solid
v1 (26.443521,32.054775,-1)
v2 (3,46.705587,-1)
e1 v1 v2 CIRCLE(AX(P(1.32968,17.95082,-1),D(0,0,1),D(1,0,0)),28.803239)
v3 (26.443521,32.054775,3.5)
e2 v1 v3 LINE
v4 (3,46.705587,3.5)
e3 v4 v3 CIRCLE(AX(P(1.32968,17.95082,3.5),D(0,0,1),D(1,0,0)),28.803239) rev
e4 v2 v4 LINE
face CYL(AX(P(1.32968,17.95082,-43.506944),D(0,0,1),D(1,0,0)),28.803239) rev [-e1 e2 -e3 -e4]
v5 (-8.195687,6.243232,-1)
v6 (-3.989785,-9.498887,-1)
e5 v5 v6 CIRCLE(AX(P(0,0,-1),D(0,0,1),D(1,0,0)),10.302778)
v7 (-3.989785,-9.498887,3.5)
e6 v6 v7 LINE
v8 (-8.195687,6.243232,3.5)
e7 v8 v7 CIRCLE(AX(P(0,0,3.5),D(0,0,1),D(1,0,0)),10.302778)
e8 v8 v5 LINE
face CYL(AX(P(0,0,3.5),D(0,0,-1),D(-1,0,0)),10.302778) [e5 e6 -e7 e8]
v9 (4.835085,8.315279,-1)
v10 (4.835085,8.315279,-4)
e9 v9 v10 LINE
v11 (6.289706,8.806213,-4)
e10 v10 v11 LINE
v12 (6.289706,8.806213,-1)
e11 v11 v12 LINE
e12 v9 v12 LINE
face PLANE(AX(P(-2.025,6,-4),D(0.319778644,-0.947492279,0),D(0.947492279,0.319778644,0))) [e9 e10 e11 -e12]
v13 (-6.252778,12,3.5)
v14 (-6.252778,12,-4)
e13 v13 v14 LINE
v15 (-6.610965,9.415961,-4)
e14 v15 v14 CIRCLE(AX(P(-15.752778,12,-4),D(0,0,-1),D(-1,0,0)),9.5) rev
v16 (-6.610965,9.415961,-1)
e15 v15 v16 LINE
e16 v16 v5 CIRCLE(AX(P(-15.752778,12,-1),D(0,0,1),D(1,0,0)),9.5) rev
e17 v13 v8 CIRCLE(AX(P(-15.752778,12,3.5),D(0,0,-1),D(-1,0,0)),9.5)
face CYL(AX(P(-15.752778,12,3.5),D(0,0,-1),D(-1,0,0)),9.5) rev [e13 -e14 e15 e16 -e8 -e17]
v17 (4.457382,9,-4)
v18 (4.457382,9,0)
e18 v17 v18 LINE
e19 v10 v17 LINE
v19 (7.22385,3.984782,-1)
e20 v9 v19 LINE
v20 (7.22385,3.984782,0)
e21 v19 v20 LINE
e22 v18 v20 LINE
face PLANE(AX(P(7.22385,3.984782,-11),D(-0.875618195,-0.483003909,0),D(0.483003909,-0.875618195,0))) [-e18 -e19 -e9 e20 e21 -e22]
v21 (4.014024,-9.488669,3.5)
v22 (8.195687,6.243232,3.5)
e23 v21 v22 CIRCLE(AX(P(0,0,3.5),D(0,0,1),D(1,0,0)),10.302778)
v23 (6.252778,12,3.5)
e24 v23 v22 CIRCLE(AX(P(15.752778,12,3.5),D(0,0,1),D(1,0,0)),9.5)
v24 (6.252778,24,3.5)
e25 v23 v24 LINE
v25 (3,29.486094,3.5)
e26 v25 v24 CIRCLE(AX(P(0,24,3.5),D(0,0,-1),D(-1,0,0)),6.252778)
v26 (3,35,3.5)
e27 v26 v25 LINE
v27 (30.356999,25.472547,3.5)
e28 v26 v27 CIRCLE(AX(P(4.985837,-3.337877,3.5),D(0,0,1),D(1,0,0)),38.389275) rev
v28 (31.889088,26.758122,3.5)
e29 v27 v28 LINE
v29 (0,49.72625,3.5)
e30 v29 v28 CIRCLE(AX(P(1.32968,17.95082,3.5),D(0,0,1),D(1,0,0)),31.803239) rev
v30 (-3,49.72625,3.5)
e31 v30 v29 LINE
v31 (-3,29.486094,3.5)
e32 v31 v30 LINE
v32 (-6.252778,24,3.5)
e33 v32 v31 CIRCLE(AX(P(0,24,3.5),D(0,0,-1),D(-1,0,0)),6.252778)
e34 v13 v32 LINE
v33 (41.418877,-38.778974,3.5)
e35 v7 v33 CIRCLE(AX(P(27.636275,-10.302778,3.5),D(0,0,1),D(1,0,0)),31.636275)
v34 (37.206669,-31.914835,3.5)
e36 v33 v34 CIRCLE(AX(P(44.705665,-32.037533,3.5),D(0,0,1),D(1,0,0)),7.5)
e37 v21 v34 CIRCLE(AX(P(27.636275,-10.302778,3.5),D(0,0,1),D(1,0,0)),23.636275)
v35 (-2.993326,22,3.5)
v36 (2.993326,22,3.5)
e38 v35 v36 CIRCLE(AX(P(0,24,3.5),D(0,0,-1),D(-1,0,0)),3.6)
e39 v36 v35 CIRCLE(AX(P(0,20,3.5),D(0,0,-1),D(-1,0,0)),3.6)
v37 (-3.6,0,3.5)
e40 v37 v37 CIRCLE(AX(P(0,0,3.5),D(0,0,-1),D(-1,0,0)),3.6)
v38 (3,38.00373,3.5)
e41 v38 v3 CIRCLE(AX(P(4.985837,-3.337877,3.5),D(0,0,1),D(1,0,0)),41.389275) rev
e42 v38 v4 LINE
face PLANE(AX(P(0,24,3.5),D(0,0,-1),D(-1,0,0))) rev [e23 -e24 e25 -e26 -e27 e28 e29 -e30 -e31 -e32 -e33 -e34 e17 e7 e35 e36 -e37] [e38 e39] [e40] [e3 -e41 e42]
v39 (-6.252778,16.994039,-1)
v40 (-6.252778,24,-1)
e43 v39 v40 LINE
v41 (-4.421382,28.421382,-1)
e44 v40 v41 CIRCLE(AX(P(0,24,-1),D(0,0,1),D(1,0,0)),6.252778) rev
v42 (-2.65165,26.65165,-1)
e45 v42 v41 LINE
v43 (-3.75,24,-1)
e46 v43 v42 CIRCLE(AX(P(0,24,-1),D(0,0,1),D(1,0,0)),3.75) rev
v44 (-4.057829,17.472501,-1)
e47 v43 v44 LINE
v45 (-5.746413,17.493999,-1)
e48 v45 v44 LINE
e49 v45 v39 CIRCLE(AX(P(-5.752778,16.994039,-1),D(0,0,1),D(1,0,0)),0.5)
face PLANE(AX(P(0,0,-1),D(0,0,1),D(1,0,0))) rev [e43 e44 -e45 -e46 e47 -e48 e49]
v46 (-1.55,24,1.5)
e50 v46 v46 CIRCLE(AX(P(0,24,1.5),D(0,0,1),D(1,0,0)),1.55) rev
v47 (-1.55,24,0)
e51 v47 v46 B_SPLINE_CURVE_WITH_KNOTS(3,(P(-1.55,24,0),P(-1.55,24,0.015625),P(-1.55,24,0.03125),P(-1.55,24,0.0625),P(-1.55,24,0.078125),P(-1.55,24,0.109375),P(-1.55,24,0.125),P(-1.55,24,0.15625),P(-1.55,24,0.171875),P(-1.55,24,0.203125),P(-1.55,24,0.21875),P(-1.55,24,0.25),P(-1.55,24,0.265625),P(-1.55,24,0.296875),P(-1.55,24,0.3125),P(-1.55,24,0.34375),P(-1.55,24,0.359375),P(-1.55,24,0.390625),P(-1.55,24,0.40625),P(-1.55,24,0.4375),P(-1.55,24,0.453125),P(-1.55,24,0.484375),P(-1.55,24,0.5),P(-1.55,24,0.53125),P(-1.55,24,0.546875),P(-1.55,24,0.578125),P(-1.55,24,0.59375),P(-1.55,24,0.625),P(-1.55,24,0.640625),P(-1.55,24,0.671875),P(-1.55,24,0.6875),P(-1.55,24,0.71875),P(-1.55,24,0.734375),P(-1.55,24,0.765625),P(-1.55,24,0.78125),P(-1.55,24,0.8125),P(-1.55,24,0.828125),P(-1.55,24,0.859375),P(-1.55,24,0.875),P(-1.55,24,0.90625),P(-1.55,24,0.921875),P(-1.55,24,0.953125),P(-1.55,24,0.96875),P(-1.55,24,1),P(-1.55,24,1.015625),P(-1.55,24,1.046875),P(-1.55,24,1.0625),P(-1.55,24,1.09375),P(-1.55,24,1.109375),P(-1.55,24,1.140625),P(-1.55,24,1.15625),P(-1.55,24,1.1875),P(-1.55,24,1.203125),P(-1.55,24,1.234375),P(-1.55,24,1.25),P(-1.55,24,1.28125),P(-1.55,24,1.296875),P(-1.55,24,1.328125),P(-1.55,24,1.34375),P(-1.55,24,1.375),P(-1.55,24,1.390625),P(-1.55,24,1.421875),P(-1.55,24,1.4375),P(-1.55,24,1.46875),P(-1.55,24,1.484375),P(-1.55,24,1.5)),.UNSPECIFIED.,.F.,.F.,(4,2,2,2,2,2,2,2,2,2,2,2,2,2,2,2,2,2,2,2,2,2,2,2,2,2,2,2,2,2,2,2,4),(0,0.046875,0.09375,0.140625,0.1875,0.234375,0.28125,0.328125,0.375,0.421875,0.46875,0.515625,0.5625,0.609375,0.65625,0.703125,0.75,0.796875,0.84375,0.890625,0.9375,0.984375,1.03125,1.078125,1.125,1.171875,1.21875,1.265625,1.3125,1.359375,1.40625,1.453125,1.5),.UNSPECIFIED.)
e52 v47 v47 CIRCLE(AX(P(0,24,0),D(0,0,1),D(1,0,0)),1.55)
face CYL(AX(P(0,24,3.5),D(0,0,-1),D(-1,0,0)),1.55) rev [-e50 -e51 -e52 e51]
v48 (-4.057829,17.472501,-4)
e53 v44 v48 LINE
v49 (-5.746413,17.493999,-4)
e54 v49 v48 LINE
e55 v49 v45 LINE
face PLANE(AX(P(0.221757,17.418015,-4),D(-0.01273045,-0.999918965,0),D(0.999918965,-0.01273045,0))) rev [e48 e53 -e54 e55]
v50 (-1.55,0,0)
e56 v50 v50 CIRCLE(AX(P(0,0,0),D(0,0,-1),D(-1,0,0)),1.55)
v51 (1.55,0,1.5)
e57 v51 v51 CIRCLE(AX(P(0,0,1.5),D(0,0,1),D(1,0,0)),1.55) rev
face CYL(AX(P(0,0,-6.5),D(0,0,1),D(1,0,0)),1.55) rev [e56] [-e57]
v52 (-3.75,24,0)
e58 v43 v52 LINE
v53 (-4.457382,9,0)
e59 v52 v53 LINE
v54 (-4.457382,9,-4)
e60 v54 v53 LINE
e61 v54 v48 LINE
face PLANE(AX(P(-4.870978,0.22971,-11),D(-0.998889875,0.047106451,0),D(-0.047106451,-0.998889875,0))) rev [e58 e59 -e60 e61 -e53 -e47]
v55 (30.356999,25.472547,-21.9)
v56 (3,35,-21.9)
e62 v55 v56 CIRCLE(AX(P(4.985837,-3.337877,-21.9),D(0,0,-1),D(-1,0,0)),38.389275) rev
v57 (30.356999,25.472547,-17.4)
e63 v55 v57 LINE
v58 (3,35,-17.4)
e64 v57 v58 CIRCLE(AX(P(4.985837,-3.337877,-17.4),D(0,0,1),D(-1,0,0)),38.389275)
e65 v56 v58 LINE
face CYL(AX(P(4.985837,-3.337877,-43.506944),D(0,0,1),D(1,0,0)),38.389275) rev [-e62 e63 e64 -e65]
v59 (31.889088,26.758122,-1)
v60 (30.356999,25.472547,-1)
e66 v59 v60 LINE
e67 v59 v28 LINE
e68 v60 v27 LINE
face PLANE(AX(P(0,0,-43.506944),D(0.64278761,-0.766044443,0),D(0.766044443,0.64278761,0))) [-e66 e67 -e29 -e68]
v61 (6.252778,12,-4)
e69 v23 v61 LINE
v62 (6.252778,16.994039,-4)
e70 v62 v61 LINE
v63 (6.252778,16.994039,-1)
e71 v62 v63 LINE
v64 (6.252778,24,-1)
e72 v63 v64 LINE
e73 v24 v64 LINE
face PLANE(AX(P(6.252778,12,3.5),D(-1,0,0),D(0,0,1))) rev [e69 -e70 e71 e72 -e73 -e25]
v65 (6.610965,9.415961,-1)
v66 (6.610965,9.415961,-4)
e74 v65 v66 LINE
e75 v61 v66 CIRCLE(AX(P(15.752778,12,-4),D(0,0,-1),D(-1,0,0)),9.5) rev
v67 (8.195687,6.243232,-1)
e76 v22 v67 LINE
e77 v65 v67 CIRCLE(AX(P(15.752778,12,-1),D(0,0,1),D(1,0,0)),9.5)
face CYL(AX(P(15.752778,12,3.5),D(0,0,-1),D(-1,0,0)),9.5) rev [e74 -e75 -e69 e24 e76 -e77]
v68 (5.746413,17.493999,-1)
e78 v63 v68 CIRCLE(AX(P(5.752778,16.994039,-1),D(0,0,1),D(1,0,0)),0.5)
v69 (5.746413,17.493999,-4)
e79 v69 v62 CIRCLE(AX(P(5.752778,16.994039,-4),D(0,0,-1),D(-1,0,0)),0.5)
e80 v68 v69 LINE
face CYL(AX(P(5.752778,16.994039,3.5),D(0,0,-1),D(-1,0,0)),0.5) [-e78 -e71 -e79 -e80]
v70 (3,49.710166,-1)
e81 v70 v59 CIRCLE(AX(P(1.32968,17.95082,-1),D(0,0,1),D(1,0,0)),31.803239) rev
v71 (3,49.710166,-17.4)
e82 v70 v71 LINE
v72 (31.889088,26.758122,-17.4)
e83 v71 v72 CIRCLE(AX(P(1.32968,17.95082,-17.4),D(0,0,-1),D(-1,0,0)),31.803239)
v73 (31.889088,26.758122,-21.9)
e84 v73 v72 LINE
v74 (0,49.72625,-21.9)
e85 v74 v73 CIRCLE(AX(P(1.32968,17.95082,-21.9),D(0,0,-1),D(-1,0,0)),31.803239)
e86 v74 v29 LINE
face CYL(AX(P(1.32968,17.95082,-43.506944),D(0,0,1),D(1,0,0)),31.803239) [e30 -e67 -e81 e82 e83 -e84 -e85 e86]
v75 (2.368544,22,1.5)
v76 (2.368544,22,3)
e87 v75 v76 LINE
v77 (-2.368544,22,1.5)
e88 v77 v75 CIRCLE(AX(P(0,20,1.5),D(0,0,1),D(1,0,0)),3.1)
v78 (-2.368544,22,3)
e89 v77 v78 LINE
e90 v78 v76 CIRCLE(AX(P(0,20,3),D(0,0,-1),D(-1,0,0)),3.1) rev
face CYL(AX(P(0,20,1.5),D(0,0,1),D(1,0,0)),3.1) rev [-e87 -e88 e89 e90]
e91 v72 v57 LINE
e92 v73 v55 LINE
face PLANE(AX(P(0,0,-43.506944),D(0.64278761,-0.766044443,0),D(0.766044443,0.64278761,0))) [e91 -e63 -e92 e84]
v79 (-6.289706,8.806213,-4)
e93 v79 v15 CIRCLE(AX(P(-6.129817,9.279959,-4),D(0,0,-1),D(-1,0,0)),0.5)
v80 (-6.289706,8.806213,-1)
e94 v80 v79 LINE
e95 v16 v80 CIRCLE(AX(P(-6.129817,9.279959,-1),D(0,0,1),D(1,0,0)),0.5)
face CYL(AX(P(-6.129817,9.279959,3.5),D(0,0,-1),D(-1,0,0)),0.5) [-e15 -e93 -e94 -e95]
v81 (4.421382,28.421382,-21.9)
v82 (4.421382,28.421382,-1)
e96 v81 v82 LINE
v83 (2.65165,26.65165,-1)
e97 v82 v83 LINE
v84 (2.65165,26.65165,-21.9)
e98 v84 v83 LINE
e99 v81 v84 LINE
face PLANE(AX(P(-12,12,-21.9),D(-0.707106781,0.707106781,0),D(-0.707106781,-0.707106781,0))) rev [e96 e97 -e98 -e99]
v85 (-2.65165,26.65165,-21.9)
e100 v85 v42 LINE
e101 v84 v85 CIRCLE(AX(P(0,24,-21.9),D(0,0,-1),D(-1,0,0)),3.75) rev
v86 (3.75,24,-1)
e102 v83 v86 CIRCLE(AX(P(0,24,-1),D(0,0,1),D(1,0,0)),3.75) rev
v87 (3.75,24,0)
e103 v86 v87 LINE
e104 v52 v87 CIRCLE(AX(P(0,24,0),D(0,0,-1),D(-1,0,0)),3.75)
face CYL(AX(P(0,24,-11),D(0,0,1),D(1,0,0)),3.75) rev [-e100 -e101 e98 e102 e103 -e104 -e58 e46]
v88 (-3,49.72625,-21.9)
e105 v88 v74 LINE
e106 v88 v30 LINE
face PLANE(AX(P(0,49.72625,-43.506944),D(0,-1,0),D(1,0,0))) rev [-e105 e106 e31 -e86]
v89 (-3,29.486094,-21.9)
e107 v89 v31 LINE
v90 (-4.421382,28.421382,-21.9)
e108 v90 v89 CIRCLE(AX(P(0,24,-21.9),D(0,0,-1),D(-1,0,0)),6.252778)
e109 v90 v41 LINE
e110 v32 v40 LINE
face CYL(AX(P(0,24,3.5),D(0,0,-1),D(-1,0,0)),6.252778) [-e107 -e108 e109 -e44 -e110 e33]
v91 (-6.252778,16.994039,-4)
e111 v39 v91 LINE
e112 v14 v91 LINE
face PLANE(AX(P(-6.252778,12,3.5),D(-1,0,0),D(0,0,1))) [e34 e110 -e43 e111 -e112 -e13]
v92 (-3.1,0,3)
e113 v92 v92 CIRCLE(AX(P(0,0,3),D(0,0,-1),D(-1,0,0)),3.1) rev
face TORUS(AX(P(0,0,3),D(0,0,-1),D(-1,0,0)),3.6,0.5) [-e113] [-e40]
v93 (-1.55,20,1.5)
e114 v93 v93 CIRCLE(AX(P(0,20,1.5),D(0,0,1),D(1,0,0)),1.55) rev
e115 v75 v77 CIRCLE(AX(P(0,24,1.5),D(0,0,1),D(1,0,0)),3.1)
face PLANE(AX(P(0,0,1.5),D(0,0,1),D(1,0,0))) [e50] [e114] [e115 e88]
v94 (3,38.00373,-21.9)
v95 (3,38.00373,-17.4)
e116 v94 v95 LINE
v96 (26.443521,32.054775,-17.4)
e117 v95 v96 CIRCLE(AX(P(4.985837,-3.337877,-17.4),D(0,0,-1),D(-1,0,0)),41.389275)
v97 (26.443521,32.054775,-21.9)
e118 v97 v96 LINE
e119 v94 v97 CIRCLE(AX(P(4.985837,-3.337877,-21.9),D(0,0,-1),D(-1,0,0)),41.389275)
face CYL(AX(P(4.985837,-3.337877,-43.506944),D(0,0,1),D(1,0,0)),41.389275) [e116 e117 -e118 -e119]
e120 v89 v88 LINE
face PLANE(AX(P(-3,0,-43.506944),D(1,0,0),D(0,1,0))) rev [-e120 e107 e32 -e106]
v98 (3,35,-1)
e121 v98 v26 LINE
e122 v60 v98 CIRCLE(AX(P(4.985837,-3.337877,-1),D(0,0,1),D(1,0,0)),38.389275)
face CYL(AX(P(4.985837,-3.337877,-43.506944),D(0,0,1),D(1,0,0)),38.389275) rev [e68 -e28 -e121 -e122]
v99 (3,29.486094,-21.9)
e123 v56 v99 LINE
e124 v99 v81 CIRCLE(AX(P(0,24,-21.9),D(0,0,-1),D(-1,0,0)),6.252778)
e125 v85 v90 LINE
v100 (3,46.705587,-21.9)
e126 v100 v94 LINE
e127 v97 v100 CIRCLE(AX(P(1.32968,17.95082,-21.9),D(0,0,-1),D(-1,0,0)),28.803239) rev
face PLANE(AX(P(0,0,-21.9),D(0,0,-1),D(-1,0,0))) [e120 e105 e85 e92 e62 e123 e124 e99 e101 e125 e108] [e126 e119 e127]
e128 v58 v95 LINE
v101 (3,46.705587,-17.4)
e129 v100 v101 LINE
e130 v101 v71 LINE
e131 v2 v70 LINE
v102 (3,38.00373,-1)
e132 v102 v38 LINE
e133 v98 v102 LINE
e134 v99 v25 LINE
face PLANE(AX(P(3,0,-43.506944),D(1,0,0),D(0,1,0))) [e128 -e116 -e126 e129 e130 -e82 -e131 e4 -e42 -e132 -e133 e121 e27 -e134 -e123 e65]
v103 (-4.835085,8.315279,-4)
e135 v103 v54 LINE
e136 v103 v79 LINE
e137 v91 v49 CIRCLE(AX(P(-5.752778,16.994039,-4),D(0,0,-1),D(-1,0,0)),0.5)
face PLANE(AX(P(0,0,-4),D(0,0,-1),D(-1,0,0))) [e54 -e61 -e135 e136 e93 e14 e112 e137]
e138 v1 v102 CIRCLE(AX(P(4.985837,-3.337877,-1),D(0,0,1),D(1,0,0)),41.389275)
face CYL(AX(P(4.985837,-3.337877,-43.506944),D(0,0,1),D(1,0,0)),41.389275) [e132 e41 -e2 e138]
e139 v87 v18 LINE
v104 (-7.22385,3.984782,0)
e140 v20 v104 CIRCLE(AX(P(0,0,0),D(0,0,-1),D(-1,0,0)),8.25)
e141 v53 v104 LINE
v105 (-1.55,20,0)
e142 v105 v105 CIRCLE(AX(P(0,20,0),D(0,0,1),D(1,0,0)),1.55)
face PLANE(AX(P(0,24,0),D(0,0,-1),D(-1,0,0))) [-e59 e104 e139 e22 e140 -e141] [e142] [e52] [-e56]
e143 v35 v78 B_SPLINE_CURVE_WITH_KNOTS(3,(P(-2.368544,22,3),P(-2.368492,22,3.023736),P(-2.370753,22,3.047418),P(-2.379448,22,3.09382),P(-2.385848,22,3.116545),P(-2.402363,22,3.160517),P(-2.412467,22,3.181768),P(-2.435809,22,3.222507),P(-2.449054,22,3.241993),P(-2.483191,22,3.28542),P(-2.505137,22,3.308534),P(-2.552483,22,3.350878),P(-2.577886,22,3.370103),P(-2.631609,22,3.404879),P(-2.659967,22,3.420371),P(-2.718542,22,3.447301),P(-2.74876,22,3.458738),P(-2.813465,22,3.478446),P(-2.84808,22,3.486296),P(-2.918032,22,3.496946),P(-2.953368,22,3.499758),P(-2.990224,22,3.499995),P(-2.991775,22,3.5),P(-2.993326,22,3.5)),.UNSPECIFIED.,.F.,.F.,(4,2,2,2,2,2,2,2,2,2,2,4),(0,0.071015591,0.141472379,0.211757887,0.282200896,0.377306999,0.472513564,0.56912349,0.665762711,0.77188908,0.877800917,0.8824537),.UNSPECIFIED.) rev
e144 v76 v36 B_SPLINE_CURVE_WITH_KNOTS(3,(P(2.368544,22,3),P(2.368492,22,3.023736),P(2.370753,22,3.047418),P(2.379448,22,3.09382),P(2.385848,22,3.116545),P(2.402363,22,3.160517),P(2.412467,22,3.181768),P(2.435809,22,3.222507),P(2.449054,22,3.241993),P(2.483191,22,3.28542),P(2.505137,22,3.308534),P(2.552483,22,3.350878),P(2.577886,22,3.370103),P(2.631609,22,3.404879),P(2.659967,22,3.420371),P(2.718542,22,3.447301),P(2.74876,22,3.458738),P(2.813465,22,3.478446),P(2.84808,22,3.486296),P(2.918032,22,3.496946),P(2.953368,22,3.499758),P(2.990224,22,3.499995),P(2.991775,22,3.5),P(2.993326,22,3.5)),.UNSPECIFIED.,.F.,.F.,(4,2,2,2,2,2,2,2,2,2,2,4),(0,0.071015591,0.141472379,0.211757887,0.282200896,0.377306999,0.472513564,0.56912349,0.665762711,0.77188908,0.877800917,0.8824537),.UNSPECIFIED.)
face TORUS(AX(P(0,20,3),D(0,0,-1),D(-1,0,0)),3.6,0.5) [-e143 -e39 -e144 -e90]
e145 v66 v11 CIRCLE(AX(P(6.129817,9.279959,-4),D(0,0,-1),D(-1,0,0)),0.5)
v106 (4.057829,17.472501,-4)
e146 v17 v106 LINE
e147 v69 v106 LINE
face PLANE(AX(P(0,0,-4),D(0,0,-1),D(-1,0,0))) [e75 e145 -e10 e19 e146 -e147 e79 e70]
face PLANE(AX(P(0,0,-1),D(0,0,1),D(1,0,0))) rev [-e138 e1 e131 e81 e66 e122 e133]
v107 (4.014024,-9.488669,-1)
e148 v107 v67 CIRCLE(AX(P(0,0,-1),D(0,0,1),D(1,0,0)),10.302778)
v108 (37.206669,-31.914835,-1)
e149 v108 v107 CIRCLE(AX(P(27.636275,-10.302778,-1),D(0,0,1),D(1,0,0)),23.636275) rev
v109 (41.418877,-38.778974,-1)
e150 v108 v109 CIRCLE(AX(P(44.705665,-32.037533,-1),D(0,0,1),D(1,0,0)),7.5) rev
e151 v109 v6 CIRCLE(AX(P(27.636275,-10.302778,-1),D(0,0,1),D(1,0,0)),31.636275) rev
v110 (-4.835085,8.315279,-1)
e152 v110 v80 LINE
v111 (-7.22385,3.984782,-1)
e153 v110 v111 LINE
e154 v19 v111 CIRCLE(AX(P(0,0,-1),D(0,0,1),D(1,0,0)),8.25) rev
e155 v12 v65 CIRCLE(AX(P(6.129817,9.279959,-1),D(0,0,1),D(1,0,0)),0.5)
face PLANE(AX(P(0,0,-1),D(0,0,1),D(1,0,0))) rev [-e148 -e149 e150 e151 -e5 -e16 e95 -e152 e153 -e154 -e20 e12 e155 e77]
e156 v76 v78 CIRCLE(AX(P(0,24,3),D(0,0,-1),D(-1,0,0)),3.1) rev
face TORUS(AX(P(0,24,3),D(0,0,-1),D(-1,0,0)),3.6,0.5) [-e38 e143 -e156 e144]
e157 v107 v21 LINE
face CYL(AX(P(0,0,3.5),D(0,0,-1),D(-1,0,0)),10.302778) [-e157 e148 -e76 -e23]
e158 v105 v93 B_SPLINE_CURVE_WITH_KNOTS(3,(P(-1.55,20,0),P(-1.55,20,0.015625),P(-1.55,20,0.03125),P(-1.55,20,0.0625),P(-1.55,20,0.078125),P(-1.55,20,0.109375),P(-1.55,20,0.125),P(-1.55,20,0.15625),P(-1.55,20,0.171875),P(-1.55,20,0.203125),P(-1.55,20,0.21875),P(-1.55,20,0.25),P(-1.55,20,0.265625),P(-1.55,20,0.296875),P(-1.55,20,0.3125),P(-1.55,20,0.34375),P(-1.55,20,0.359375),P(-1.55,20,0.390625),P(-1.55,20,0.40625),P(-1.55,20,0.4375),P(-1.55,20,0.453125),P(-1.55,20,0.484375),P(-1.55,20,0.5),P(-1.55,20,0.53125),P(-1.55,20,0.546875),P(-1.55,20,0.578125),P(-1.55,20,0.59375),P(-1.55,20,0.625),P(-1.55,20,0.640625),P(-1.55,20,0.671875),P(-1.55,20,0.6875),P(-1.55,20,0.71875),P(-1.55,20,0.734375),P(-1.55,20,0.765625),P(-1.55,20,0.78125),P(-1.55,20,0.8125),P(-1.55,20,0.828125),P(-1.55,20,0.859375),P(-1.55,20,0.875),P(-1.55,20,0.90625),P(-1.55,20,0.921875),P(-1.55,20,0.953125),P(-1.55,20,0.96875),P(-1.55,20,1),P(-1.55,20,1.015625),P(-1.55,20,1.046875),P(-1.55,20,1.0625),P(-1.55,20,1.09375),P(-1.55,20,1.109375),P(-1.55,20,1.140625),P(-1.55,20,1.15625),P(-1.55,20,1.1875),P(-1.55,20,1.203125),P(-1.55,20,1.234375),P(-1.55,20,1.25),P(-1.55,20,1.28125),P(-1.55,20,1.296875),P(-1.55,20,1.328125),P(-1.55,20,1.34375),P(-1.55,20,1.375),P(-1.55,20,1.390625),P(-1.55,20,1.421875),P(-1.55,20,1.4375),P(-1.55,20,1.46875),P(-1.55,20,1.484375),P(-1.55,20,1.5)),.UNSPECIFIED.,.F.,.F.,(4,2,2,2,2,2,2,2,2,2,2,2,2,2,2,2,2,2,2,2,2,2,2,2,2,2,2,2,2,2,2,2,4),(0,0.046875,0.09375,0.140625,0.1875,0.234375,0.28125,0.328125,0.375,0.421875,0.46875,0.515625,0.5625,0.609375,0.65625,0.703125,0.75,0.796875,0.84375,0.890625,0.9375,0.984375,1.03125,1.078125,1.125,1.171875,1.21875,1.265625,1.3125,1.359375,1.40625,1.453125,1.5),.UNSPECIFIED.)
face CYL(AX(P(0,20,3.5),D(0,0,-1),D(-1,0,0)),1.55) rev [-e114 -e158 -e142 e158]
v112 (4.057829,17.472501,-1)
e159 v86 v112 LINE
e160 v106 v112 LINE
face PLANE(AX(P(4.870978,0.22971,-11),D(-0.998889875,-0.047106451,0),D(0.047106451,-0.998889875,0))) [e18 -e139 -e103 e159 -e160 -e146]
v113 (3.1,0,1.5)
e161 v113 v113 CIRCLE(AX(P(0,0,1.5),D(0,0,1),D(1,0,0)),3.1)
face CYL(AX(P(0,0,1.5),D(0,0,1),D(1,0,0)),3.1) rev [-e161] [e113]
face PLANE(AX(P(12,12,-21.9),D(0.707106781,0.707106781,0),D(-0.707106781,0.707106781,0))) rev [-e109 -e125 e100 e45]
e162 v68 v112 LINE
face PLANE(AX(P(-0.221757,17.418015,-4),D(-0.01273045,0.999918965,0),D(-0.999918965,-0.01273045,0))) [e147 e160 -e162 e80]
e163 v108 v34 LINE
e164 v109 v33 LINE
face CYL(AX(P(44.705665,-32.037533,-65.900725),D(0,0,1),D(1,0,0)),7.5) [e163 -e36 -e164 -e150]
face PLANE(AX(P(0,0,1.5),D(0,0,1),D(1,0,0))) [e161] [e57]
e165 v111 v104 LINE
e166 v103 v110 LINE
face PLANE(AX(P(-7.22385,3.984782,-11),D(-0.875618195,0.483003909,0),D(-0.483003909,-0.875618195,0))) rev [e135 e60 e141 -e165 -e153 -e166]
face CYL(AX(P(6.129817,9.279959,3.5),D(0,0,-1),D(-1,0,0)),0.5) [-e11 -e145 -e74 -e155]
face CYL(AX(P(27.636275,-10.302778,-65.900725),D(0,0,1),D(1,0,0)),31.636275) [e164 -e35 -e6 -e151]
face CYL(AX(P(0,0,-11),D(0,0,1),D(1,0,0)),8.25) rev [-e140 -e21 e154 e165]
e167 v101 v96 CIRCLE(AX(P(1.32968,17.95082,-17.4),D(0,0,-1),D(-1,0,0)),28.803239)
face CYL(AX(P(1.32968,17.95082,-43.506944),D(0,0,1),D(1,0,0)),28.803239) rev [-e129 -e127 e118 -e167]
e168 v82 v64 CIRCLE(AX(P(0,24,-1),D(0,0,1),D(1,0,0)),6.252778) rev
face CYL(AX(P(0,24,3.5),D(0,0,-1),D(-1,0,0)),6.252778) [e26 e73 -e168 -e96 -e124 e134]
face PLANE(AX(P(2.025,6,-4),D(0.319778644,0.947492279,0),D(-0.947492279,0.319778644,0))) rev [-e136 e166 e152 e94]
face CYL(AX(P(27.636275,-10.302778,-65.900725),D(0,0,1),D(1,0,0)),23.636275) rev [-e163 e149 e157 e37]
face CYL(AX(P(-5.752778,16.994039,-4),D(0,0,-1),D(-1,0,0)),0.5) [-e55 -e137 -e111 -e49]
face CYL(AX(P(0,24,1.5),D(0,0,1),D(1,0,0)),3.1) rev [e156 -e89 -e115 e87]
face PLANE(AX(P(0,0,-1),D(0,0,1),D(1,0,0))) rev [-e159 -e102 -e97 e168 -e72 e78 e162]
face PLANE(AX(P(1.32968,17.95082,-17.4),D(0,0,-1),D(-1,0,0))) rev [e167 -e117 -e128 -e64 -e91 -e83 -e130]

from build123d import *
from build123d.topology import SkipClean

# Parameters (mm, degrees)
SKETCH1_R           = 1.55
BOSS_EXTRUDE1_DEPTH = 3.5
BOSS_EXTRUDE2_START = -1
BOSS_EXTRUDE2_DEPTH = 1
BOSS_EXTRUDE3_START = 3
BOSS_EXTRUDE3_DEPTH = 3
SKETCH3_R           = 3.1
CUT_EXTRUDE1_DEPTH  = 2
CUT_EXTRUDE7_START  = 11
CUT_EXTRUDE7_DEPTH  = 11
BOSS_EXTRUDE4_START = -4.5
BOSS_EXTRUDE4_DEPTH = 4.5
BOSS_EXTRUDE5_START = -4.5
BOSS_EXTRUDE5_DEPTH = 4.5
BOSS_EXTRUDE6_START = 20.9
BOSS_EXTRUDE6_DEPTH = 20.9
CUT_EXTRUDE8_DEPTH  = 16.4
SKETCH13_R          = 1.55
CUT_EXTRUDE9_DEPTH  = 10
SKETCH14_R          = 3.1
CUT_EXTRUDE10_DEPTH = 2
FILLET2_R           = 0.5


# Read off the part's stored shape, not the designer's step: Boss-Extrude5
with BuildPart() as part:
    # Sketch1 → Boss-Extrude1 (new body)
    with BuildSketch(Plane.XY):
        with BuildLine():
            Line((-6.252777778, 12), (-6.252777778, 24))
            ThreePointArc((-6.252777778, 24), (0, 30.252777778), (6.252777778, 24))
            Line((6.252777778, 24), (6.252777778, 12))
            ThreePointArc((6.252777778, 12), (6.751601127, 8.96210288), (8.195687022, 6.24323187))
            ThreePointArc((8.195687022, 6.24323187), (0, -10.302777778), (-8.195687022, 6.24323187))
            ThreePointArc((-8.195687022, 6.24323187), (-6.751601127, 8.96210288), (-6.252777778, 12))
        make_face()
        with Locations(Location((0, 20, 0), (0, 0, 180))):
            Circle(SKETCH1_R, mode=Mode.SUBTRACT)
        with Locations(Location((0, 24, 0), (0, 0, 180))):
            Circle(SKETCH1_R, mode=Mode.SUBTRACT)
    extrude(amount=BOSS_EXTRUDE1_DEPTH)

    # Sketch1<6> → Boss-Extrude2 (add)
    with SkipClean():  # the faces are left unmerged after this step: merging them gives an invalid solid
        with BuildSketch(Plane.XY.offset(BOSS_EXTRUDE2_START)):
            with BuildLine():
                Line((-6.252777778, 24), (-6.252777778, 12))
                ThreePointArc((-6.252777778, 12), (-6.751601127, 8.96210288), (-8.195687022, 6.24323187))
                ThreePointArc((-8.195687022, 6.24323187), (0, -10.302777778), (8.195687022, 6.24323187))
                ThreePointArc((8.195687022, 6.24323187), (6.751601127, 8.96210288), (6.252777778, 12))
                Line((6.252777778, 12), (6.252777778, 24))
                ThreePointArc((6.252777778, 24), (0, 30.252777778), (-6.252777778, 24))
            make_face()
            with BuildLine():
                ThreePointArc((-3.740199612, 9.599902958), (-3.562277736, 10.794094226), (-3.502777778, 12))
                Line((-3.502777778, 12), (-3.35, 24))
                ThreePointArc((-3.35, 24), (0, 27.35), (3.35, 24))
                Line((3.35, 24), (3.502777778, 12))
                ThreePointArc((3.502777778, 12), (3.562277736, 10.794094226), (3.740199612, 9.599902958))
                ThreePointArc((3.740199612, 9.599902958), (4.521843537, 7.73681106), (5.173381632, 5.824331843))
                ThreePointArc((5.173381632, 5.824331843), (7.105921174, 3.192585661), (7.790168094, 0))
                ThreePointArc((7.790168094, 0), (-3.192585661, -7.105921174), (-5.173381632, 5.824331843))
                ThreePointArc((-5.173381632, 5.824331843), (-4.521843537, 7.73681106), (-3.740199612, 9.599902958))
            make_face(mode=Mode.SUBTRACT)
        extrude(amount=BOSS_EXTRUDE2_DEPTH)

    # Sketch2 → Boss-Extrude3 (add)
    with SkipClean():  # the faces are left unmerged after this step: merging them gives an invalid solid
        with BuildSketch(Plane(origin=(0, 0, -1), x_dir=(-1, 0, 0), z_dir=(0, 0, -1)).offset(BOSS_EXTRUDE3_START)):
            with BuildLine():
                Line((6.252777778, 17.500445731), (3.583193826, 17.466457972))
                Line((3.583193826, 17.466457972), (3.65286916, 11.993777148))
                ThreePointArc((3.65286916, 11.993777148), (3.756779571, 10.417642799), (4.065118793, 8.868474059))
                ThreePointArc((4.065118793, 8.868474059), (4.214668194, 8.512593617), (4.359521295, 8.154775937))
                Line((4.359521295, 8.154775937), (6.751601127, 8.96210288))
                ThreePointArc((6.751601127, 8.96210288), (6.378313042, 10.460710907), (6.252777778, 12))
                Line((6.252777778, 12), (6.252777778, 17.500445731))
            make_face()
            with BuildLine():
                Line((-3.583193826, 17.466457972), (-6.252777778, 17.500445731))
                Line((-6.252777778, 17.500445731), (-6.252777778, 12))
                ThreePointArc((-6.252777778, 12), (-6.378313042, 10.460710907), (-6.751601127, 8.96210288))
                Line((-6.751601127, 8.96210288), (-4.359521295, 8.154775937))
                ThreePointArc((-4.359521295, 8.154775937), (-4.214668194, 8.512593617), (-4.065118793, 8.868474059))
                ThreePointArc((-4.065118793, 8.868474059), (-3.756779571, 10.417642799), (-3.65286916, 11.993777148))
                Line((-3.65286916, 11.993777148), (-3.583193826, 17.466457972))
            make_face()
        extrude(amount=-BOSS_EXTRUDE3_DEPTH)

    # Sketch3 → Cut-Extrude1 (cut)
    with SkipClean():  # the faces are left unmerged after this step: merging them gives an invalid solid
        with BuildSketch(Plane.XY.offset(3.5)):
            with Locations((0, 20)):
                Circle(SKETCH3_R)
            with Locations((0, 24)):
                Circle(SKETCH3_R)
        extrude(amount=-CUT_EXTRUDE1_DEPTH, mode=Mode.SUBTRACT)

    # Sketch8 → Cut-Extrude7 (cut)
    with SkipClean():  # the faces are left unmerged after this step: merging them gives an invalid solid
        with BuildSketch(Plane(origin=(0, 0, 0), x_dir=(-1, 0, 0), z_dir=(0, 0, -1)).offset(CUT_EXTRUDE7_START)):
            with BuildLine():
                Line((7.223850112, 3.984782248), (4.457382043, 9))
                Line((4.457382043, 9), (3.75, 24))
                ThreePointArc((3.75, 24), (0, 27.75), (-3.75, 24))
                Line((-3.75, 24), (-4.457382043, 9))
                Line((-4.457382043, 9), (-7.223850112, 3.984782248))
                ThreePointArc((-7.223850112, 3.984782248), (0, -8.25), (7.223850112, 3.984782248))
            make_face()
            with BuildLine():
                Line((3.35, 24), (3.502777778, 12))
                ThreePointArc((3.502777778, 12), (3.562277736, 10.794094226), (3.740199612, 9.599902958))
                ThreePointArc((3.740199612, 9.599902958), (4.521843537, 7.73681106), (5.173381632, 5.824331843))
                ThreePointArc((5.173381632, 5.824331843), (0, -7.790168094), (-5.173381632, 5.824331843))
                ThreePointArc((-5.173381632, 5.824331843), (-4.521843537, 7.73681106), (-3.740199612, 9.599902958))
                ThreePointArc((-3.740199612, 9.599902958), (-3.562277736, 10.794094226), (-3.502777778, 12))
                Line((-3.502777778, 12), (-3.35, 24))
                ThreePointArc((-3.35, 24), (0, 27.35), (3.35, 24))
            make_face(mode=Mode.SUBTRACT)
        extrude(amount=-CUT_EXTRUDE7_DEPTH, mode=Mode.SUBTRACT)

    # Sketch4 → Boss-Extrude4 (add)
    with SkipClean():  # the faces are left unmerged after this step: merging them gives an invalid solid
        with BuildSketch(Plane.XY.offset(3.5).offset(BOSS_EXTRUDE4_START)):
            with BuildLine():
                Line((-3, 35), (-3, 29.486094233))
                ThreePointArc((-3, 29.486094233), (0, 30.252777778), (3, 29.486094233))
                Line((3, 29.486094233), (3, 35))
                ThreePointArc((3, 35), (17.611661727, 32.915742455), (30.356999166, 25.472546804))
                Line((30.356999166, 25.472546804), (31.889088052, 26.758122023))
                ThreePointArc((31.889088052, 26.758122023), (19.916717904, 43.757176376), (0, 49.726250325))
                Line((0, 49.726250325), (-3, 49.726250325))
                Line((-3, 49.726250325), (-3, 35))
            make_face()
            with BuildLine():
                ThreePointArc((26.443521088, 32.054775081), (15.166000225, 36.77990325), (3, 38.003729853))
                Line((3, 38.003729853), (3, 46.705586839))
                ThreePointArc((3, 46.705586839), (16.594325155, 42.376568373), (26.443521088, 32.054775081))
            make_face(mode=Mode.SUBTRACT)
        extrude(amount=BOSS_EXTRUDE4_DEPTH)

    # Boss-Extrude5 outline → Boss-Extrude5 (add)
    with SkipClean():  # the faces are left unmerged after this step: merging them gives an invalid solid
        with BuildSketch(Plane.XY.offset(3.5).offset(BOSS_EXTRUDE5_START)):
            with BuildLine():
                ThreePointArc((37.206668655, -31.914835371), (14.403856046, -29.887888853), (4.014024416, -9.488668923))
                ThreePointArc((4.014024416, -9.488668923), (0.013152601, -10.302769383), (-3.989784744, -9.498886653))
                ThreePointArc((-3.989784744, -9.498886653), (10.49194269, -36.890853177), (41.418876904, -38.778973849))
                ThreePointArc((41.418876904, -38.778973849), (51.098034229, -28.114827977), (37.206668655, -31.914835371))
            make_face()
        extrude(amount=BOSS_EXTRUDE5_DEPTH)

    # Sketch11 → Boss-Extrude6 (add)
    # profile 1 of 2: a face of its own
    with SkipClean():  # the faces are left unmerged after this step: merging them gives an invalid solid
        with BuildSketch(Plane(origin=(0, 0, -1), x_dir=(-1, 0, 0), z_dir=(0, 0, -1)).offset(BOSS_EXTRUDE6_START)):
            with BuildLine():
                Line((0, 49.726250325), (0, 27.75))
                ThreePointArc((0, 27.75), (1.435062871, 27.464548247), (2.651650429, 26.651650429))
                Line((2.651650429, 26.651650429), (4.421381568, 28.421381568))
                ThreePointArc((4.421381568, 28.421381568), (3.748683684, 29.00445807), (3, 29.486094233))
                Line((3, 29.486094233), (3, 49.726250325))
                Line((3, 49.726250325), (0, 49.726250325))
            make_face()
        # profile 2 of 2: a face of its own
        with BuildSketch(Plane(origin=(0, 0, -1), x_dir=(-1, 0, 0), z_dir=(0, 0, -1)).offset(BOSS_EXTRUDE6_START)):
            with BuildLine():
                ThreePointArc((-3, 29.486094233), (-3.748683684, 29.00445807), (-4.421381568, 28.421381568))
                Line((-4.421381568, 28.421381568), (-2.651650429, 26.651650429))
                ThreePointArc((-2.651650429, 26.651650429), (-1.435062871, 27.464548247), (0, 27.75))
                Line((0, 27.75), (0, 49.726250325))
                ThreePointArc((0, 49.726250325), (-19.916717904, 43.757176376), (-31.889088052, 26.758122023))
                Line((-31.889088052, 26.758122023), (-30.356999166, 25.472546804))
                ThreePointArc((-30.356999166, 25.472546804), (-17.611661727, 32.915742455), (-3, 35))
                Line((-3, 35), (-3, 29.486094233))
            make_face()
            with BuildLine():
                ThreePointArc((-26.443521088, 32.054775081), (-16.594325155, 42.376568373), (-3, 46.705586839))
                Line((-3, 46.705586839), (-3, 38.003729853))
                ThreePointArc((-3, 38.003729853), (-15.166000225, 36.77990325), (-26.443521088, 32.054775081))
            make_face(mode=Mode.SUBTRACT)
        extrude(amount=-BOSS_EXTRUDE6_DEPTH)

    # Sketch12 → Cut-Extrude8 (cut)
    with SkipClean():  # the faces are left unmerged after this step: merging them gives an invalid solid
        with BuildSketch(Plane(origin=(0, 0, -17.4), x_dir=(-1, 0, 0), z_dir=(0, 0, -1))):
            with BuildLine():
                Line((-3, 49.710165883), (-3, 35))
                ThreePointArc((-3, 35), (-17.611661727, 32.915742455), (-30.356999166, 25.472546804))
                Line((-30.356999166, 25.472546804), (-31.889088052, 26.758122023))
                ThreePointArc((-31.889088052, 26.758122023), (-21.113206485, 42.851785565), (-3, 49.710165883))
            make_face()
        extrude(amount=-CUT_EXTRUDE8_DEPTH, mode=Mode.SUBTRACT)

    # Sketch13 → Cut-Extrude9 (cut)
    with SkipClean():  # the faces are left unmerged after this step: merging them gives an invalid solid
        with BuildSketch(Plane.XY.offset(3.5)):
            Circle(SKETCH13_R)
        extrude(amount=-CUT_EXTRUDE9_DEPTH, mode=Mode.SUBTRACT)

    # Sketch14 → Cut-Extrude10 (cut)
    with SkipClean():  # the faces are left unmerged after this step: merging them gives an invalid solid
        with BuildSketch(Plane.XY.offset(3.5)):
            Circle(SKETCH14_R)
        extrude(amount=-CUT_EXTRUDE10_DEPTH, mode=Mode.SUBTRACT)

    # Fillet2
    # the kernel refuses this fillet: 0.5 mm, written as the material it takes off along each edge
    with BuildSketch(Plane(origin=(0, 24, 3.5), x_dir=(0.44840297352360914, -0.8938315128340382, 0), z_dir=(-0.8938315128340382, -0.44840297352360914, 0))) as fillet2_piece_1:
        with BuildLine():
            CenterArc((3.1 + FILLET2_R, -FILLET2_R), FILLET2_R, 90, 90)
            Line((3.1, -FILLET2_R), (3.1, 0))
            Line((3.1, 0), (3.1 + FILLET2_R, 0))
        make_face()
    revolve(axis=Axis((0, 24, 3.5), (0, 0, 1)), revolution_arc=306.717467059, mode=Mode.SUBTRACT)
    with BuildSketch(Plane(origin=(0, 20, 3.5), x_dir=(0.44840297352362823, 0.8938315128340286, 0), z_dir=(-0.8938315128340286, 0.44840297352362823, 0))) as fillet2_piece_2:
        with BuildLine():
            CenterArc((3.1 + FILLET2_R, FILLET2_R), FILLET2_R, 180, 90)
            Line((3.1, FILLET2_R), (3.1, 0))
            Line((3.1, 0), (3.1 + FILLET2_R, 0))
        make_face()
    revolve(axis=Axis((0, 20, 3.5), (0, 0, -1)), revolution_arc=306.717467059, mode=Mode.SUBTRACT)
    with BuildSketch(Plane(origin=(0, 0, 3.5), x_dir=(1, 0, 0), z_dir=(0, -1, 0))) as fillet2_piece_3:
        with BuildLine():
            CenterArc((3.1 + FILLET2_R, -FILLET2_R), FILLET2_R, 90, 90)
            Line((3.1, -FILLET2_R), (3.1, 0))
            Line((3.1, 0), (3.1 + FILLET2_R, 0))
        make_face()
    revolve(axis=Axis((0, 0, 3.5), (0, 0, 1)), mode=Mode.SUBTRACT)
    with BuildSketch(Plane(origin=(-6.751601127, 8.96210288, -5.218730444), x_dir=(0.9474922789871985, -0.31977864415818164, 0), z_dir=(0, 0, 1))) as fillet2_piece_4:
        with BuildLine():
            CenterArc((0.487492178, 0.5), FILLET2_R, 182.865983983, 87.134016017)
            ThreePointArc((-0.011882431, 0.475), (-0.002971072, 0.2375743), (0, 0))
            Line((0, 0), (0.487492178, 0))
        make_face()
    extrude(amount=4.218730444, mode=Mode.SUBTRACT)
    with BuildSketch(Plane(origin=(-6.252777778, 17.500445731, -5.266015654), x_dir=(0, -1, 0), z_dir=(0, 0, 1))) as fillet2_piece_5:
        with BuildLine():
            CenterArc((FILLET2_R * 1.01281252351, FILLET2_R), FILLET2_R, 179.270579253, 90.729420747)
            Line((FILLET2_R * 0.0128935589671, FILLET2_R * 1.01273044978), (0, 0))
            Line((0, 0), (FILLET2_R * 1.01281252351, 0))
        make_face()
    extrude(amount=4.266015654, mode=Mode.SUBTRACT)
    with BuildSketch(Plane(origin=(6.252777778, 17.500445731, -5.266015654), x_dir=(0, -1, 0), z_dir=(0, 0, 1))) as fillet2_piece_6:
        with BuildLine():
            CenterArc((FILLET2_R * 1.01281252351, -FILLET2_R), FILLET2_R, 90, 90.729420747)
            Line((FILLET2_R * 0.0128935589671, -FILLET2_R * 1.01273044978), (0, 0))
            Line((0, 0), (FILLET2_R * 1.01281252351, 0))
        make_face()
    extrude(amount=4.266015654, mode=Mode.SUBTRACT)
    with BuildSketch(Plane(origin=(6.751601127, 8.96210288, -5.218730444), x_dir=(-0.9474922789872003, -0.3197786441581759, 0), z_dir=(0, 0, 1))) as fillet2_piece_7:
        with BuildLine():
            CenterArc((0.487492178, -0.5), FILLET2_R, 90, 87.134016017)
            ThreePointArc((-0.011882431, -0.475), (-0.002971072, -0.2375743), (0, 0))
            Line((0, 0), (0.487492178, 0))
        make_face()
    extrude(amount=4.218730444, mode=Mode.SUBTRACT)


solid = part.part
